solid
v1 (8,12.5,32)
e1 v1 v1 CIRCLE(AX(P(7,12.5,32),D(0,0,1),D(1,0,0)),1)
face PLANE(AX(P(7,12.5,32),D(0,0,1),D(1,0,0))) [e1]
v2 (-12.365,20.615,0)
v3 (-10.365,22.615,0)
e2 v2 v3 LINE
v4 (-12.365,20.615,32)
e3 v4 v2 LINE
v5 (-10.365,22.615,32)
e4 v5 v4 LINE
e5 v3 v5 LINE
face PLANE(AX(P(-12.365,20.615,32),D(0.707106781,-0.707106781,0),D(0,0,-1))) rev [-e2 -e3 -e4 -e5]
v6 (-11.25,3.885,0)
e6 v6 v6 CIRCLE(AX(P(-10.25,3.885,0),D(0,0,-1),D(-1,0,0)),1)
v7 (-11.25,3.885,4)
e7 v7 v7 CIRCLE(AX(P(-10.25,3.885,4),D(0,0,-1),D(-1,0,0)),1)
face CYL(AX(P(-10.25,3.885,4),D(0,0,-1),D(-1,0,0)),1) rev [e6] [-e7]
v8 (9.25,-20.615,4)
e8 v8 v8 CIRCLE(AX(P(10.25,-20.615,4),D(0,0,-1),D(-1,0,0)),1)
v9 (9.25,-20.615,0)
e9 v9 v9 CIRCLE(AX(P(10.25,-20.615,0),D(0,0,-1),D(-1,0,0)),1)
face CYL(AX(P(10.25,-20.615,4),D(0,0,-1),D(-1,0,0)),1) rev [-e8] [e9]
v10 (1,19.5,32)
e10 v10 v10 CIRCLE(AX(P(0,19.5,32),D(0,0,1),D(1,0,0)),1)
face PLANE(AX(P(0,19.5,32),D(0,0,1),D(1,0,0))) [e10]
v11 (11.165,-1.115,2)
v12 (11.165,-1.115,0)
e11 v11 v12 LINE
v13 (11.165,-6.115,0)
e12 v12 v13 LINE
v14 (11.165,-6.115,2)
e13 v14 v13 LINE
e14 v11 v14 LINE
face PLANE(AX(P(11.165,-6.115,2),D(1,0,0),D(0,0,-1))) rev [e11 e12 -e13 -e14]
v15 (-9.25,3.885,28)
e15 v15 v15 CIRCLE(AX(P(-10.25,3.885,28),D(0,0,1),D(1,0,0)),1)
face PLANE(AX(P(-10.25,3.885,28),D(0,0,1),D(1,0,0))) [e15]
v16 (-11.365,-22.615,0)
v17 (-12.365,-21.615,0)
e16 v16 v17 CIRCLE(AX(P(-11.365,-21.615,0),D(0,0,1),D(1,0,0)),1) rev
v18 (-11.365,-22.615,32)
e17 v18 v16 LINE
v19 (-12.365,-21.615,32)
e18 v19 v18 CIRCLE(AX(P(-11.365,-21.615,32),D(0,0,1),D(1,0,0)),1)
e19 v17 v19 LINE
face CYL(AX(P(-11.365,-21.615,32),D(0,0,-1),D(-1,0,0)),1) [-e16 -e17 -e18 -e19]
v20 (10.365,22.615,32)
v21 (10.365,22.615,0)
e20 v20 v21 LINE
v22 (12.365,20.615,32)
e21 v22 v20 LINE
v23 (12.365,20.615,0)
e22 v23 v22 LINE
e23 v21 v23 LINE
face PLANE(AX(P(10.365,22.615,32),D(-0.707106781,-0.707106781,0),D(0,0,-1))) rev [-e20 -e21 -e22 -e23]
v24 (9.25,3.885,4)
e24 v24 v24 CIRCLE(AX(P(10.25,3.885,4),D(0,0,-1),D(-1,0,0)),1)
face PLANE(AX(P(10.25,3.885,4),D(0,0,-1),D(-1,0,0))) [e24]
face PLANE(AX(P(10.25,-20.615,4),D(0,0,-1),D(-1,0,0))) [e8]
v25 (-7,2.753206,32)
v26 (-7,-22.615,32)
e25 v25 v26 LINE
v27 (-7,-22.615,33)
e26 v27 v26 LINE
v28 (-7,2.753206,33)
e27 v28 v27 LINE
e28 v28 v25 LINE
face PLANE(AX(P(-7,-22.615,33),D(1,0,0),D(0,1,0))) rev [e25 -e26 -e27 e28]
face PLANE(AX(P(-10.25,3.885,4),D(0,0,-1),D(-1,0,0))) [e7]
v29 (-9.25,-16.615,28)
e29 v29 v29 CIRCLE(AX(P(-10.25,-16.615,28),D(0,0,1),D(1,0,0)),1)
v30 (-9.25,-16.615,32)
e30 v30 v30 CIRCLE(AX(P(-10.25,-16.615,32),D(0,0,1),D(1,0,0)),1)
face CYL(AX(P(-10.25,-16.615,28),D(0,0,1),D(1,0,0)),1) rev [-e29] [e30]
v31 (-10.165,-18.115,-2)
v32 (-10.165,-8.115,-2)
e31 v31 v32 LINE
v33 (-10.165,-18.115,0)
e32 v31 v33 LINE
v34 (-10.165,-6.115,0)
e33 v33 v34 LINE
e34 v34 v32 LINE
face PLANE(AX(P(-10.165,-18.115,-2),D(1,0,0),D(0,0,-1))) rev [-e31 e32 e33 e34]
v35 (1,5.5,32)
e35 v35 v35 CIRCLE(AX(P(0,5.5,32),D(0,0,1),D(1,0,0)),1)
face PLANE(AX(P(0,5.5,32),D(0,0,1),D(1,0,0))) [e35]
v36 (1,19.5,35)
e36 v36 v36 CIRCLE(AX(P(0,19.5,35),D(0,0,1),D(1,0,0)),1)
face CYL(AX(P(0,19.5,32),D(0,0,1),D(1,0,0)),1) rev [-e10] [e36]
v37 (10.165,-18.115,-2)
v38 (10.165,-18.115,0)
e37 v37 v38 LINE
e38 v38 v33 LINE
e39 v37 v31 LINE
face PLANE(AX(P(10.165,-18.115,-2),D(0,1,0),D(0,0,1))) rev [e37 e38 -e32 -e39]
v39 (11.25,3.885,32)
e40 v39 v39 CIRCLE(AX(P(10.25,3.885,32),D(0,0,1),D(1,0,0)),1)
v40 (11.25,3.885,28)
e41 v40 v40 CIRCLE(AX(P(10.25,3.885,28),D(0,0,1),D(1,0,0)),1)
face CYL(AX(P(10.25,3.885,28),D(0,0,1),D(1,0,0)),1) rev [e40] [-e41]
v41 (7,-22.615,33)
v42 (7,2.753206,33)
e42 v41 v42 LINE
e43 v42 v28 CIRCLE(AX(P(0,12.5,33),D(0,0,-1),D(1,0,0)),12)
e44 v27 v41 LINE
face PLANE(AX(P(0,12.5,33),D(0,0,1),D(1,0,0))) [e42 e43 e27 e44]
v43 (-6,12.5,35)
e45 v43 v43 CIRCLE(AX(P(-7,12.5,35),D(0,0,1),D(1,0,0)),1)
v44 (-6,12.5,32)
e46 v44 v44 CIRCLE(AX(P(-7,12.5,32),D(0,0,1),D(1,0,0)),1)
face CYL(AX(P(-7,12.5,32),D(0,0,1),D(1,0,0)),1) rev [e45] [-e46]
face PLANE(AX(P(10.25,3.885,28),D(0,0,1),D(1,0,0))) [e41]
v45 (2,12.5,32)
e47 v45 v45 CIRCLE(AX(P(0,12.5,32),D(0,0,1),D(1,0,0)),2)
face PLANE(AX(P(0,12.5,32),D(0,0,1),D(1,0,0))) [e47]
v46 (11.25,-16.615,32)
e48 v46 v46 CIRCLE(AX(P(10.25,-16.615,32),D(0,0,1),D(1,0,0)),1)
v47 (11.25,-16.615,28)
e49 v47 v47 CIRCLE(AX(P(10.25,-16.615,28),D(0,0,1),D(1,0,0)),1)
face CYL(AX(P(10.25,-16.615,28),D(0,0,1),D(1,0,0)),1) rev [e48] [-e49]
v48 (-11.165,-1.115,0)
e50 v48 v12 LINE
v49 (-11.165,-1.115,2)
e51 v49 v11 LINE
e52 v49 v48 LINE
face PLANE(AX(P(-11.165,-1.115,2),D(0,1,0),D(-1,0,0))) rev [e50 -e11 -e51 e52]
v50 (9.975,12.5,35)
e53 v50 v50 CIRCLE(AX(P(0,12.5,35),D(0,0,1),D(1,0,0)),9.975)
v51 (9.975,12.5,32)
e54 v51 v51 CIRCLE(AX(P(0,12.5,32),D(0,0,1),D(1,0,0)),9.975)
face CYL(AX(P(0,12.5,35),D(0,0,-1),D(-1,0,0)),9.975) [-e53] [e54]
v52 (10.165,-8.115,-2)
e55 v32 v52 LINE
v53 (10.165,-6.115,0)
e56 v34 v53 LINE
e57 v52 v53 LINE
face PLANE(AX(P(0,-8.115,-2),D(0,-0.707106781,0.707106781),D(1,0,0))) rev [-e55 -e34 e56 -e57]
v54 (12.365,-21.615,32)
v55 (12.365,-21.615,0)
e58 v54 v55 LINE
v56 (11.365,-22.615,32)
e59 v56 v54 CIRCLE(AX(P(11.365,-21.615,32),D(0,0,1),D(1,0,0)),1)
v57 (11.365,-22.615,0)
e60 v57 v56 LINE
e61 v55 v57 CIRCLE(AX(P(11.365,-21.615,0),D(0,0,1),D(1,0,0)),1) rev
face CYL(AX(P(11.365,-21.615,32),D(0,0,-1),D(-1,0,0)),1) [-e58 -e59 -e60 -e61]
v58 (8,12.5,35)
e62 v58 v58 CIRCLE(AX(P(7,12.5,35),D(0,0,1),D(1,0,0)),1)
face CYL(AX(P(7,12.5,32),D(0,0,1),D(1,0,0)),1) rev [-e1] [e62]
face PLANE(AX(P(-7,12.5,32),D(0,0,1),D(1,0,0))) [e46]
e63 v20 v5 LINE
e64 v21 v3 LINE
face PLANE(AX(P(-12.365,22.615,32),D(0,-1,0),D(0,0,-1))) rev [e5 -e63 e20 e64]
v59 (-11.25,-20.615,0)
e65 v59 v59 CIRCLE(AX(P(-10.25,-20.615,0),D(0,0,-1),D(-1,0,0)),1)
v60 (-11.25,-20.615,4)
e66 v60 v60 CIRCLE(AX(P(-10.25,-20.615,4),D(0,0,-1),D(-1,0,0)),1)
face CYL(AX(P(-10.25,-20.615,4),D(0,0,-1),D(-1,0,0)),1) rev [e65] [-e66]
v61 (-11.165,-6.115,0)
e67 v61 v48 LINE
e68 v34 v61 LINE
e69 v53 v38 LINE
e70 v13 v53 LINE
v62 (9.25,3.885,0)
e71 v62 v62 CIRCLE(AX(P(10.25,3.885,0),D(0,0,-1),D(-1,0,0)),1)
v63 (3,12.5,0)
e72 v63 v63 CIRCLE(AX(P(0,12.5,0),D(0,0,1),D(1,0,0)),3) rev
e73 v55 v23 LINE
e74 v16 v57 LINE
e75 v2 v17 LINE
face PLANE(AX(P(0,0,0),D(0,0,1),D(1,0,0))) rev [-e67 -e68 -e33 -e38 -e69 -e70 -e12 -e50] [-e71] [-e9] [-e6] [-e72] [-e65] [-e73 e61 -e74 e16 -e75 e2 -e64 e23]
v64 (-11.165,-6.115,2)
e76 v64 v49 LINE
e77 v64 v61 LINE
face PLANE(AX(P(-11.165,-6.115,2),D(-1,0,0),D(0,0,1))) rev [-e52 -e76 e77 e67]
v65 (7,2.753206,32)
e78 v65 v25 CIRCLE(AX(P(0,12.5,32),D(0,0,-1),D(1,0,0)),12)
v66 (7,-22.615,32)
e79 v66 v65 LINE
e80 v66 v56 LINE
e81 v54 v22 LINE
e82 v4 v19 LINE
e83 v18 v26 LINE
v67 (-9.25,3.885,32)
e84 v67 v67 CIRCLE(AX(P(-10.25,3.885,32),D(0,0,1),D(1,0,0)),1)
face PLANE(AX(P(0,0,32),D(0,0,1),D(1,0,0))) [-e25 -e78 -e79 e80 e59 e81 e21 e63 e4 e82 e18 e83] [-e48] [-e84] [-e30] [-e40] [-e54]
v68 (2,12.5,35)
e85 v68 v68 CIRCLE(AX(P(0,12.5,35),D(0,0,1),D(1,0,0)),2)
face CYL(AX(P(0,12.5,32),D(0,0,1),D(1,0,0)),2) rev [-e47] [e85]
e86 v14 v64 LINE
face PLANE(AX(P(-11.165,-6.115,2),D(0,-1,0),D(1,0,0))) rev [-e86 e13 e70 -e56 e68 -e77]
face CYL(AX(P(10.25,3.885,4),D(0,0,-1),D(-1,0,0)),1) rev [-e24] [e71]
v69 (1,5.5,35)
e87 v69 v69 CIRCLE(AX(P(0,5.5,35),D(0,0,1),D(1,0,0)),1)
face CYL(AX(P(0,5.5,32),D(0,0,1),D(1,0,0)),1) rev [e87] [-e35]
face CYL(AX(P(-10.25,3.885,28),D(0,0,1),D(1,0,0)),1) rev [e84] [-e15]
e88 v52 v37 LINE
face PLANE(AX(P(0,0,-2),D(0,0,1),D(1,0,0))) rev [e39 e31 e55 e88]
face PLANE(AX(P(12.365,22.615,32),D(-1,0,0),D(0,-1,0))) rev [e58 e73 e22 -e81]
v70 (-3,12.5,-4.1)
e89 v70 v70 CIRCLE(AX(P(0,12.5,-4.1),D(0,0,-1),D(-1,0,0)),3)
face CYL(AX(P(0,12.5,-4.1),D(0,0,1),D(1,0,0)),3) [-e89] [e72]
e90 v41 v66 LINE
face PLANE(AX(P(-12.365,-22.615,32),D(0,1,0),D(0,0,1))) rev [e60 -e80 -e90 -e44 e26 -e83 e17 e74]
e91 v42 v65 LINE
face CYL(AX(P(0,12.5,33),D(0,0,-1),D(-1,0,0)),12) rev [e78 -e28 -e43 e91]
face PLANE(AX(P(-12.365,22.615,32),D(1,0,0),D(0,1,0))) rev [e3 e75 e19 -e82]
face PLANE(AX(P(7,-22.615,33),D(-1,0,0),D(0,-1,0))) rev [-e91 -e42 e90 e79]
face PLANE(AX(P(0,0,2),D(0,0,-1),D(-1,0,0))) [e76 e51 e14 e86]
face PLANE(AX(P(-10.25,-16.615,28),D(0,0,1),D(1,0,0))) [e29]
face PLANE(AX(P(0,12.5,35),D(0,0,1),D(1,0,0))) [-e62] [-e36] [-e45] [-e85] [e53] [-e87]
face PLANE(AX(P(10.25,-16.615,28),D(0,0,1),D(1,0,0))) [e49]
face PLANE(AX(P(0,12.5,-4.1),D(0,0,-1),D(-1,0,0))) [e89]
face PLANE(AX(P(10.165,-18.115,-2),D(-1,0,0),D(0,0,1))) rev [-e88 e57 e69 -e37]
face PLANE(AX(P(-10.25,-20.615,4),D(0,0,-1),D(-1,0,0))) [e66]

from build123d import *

# Parameters (mm, degrees)
SKETCH_1_W          = 24.73
SKETCH_1_H          = 45.23
EXTRUDE_1_DEPTH     = 32
CHAMFER_1_SIZE      = 2
EXTRUDE_2_DEPTH     = 1
SKETCH_3_R          = 1
CUT_EXTRUDE_1_DEPTH = 4
SKETCH_4_R          = 9.975
EXTRUDE_3_DEPTH     = 3
SKETCH_5_R          = 2
SKETCH_5_R_2        = 1
CUT_EXTRUDE_2_DEPTH = 3
SKETCH_6_W          = 20.33
SKETCH_6_H          = 12
EXTRUDE_4_DEPTH     = 2
CHAMFER_2_SIZE      = 2
SKETCH_7_W          = 22.33
SKETCH_7_H          = 5
CUT_EXTRUDE_3_DEPTH = 2
SKETCH_8_R          = 3
EXTRUDE_5_DEPTH     = 4.1
CUT_EXTRUDE_START   = -4
SKETCH_9_R          = 1
CUT_EXTRUDE_4_DEPTH = 4
FILLET_1_R          = 1


with BuildPart() as part:
    # 스케치1 → 보스-돌출1 (new body)
    with BuildSketch(Plane.XY):
        Rectangle(SKETCH_1_W, SKETCH_1_H)
    extrude(amount=EXTRUDE_1_DEPTH)

    # 모따기1
    chamfer_1_edges = [part.edges().sort_by_distance(p)[0] for p in [
        (-12.365, 22.615, 16),
        (12.365, 22.615, 16),
    ]]
    chamfer(chamfer_1_edges, length=CHAMFER_1_SIZE)

    # 스케치2 → 보스-돌출2 (add)
    with BuildSketch(Plane.XY.offset(32)):
        with BuildLine():
            Line((-7, -22.615), (7, -22.615))
            Line((7, -22.615), (7, 2.753205655))
            ThreePointArc((7, 2.753205655), (0, 0.5), (-7, 2.753205655))
            Line((-7, 2.753205655), (-7, -22.615))
        make_face()
    extrude(amount=EXTRUDE_2_DEPTH)

    # 스케치3 → 컷-돌출1 (cut)
    with BuildSketch(Plane.XY.offset(32)):
        with Locations((-10.25, 3.885)):
            Circle(SKETCH_3_R)
        with Locations((-10.25, -16.615)):
            Circle(SKETCH_3_R)
        with Locations((10.25, -16.615)):
            Circle(SKETCH_3_R)
        with Locations((10.25, 3.885)):
            Circle(SKETCH_3_R)
    extrude(amount=-CUT_EXTRUDE_1_DEPTH, mode=Mode.SUBTRACT)

    # 스케치4 → 보스-돌출3 (add)
    with BuildSketch(Plane.XY.offset(32)):
        with Locations((0, 12.5)):
            Circle(SKETCH_4_R)
    extrude(amount=EXTRUDE_3_DEPTH)

    # 스케치5 → 컷-돌출2 (cut)
    with BuildSketch(Plane.XY.offset(35)):
        with Locations((0, 12.5)):
            Circle(SKETCH_5_R)
        with Locations((0, 19.5)):
            Circle(SKETCH_5_R_2)
        with Locations((7, 12.5)):
            Circle(SKETCH_5_R_2)
        with Locations((0, 5.5)):
            Circle(SKETCH_5_R_2)
        with Locations((-7, 12.5)):
            Circle(SKETCH_5_R_2)
    extrude(amount=-CUT_EXTRUDE_2_DEPTH, mode=Mode.SUBTRACT)

    # 스케치6 → 보스-돌출4 (add)
    with BuildSketch(Plane(origin=(0, 0, 0), x_dir=(-1, 0, 0), z_dir=(0, 0, -1))):
        with Locations((0, -12.115)):
            Rectangle(SKETCH_6_W, SKETCH_6_H)
    extrude(amount=EXTRUDE_4_DEPTH)

    # 모따기2
    chamfer_2_edges = [part.edges().sort_by_distance(p)[0] for p in [
        (0, -6.115, -2),
    ]]
    chamfer(chamfer_2_edges, length=CHAMFER_2_SIZE - 0.0001)  # a hair under: the kernel refuses the full size

    # 스케치7 → 컷-돌출3 (cut)
    with BuildSketch(Plane(origin=(0, 0, 0), x_dir=(-1, 0, 0), z_dir=(0, 0, -1))):
        with Locations((0, -3.615)):
            Rectangle(SKETCH_7_W, SKETCH_7_H)
    extrude(amount=-CUT_EXTRUDE_3_DEPTH, mode=Mode.SUBTRACT)

    # 스케치8 → 보스-돌출5 (add)
    with BuildSketch(Plane(origin=(0, 0, 0), x_dir=(-1, 0, 0), z_dir=(0, 0, -1))):
        with Locations(Location((0, 12.5, 0), (0, 0, 180))):
            Circle(SKETCH_8_R)
    extrude(amount=EXTRUDE_5_DEPTH)

    # 스케치9 → 컷-돌출4 (cut)
    with BuildSketch(Plane(origin=(0, 0, 0), x_dir=(-1, 0, 0), z_dir=(0, 0, -1)).offset(CUT_EXTRUDE_START)):
        with Locations(Location((-10.25, 3.885, 0), (0, 0, 180))):
            Circle(SKETCH_9_R)
        with Locations(Location((10.25, 3.885, 0), (0, 0, 180))):
            Circle(SKETCH_9_R)
        with Locations((-10.25, -20.615)):
            Circle(SKETCH_9_R)
        with Locations((10.25, -20.615)):
            Circle(SKETCH_9_R)
    extrude(amount=CUT_EXTRUDE_4_DEPTH, mode=Mode.SUBTRACT)

    # 필렛1
    fillet_1_edges = [part.edges().sort_by_distance(p)[0] for p in [
        (12.365, -22.615, 16),
        (-12.365, -22.615, 16),
    ]]
    fillet(fillet_1_edges, radius=FILLET_1_R)


solid = part.part
